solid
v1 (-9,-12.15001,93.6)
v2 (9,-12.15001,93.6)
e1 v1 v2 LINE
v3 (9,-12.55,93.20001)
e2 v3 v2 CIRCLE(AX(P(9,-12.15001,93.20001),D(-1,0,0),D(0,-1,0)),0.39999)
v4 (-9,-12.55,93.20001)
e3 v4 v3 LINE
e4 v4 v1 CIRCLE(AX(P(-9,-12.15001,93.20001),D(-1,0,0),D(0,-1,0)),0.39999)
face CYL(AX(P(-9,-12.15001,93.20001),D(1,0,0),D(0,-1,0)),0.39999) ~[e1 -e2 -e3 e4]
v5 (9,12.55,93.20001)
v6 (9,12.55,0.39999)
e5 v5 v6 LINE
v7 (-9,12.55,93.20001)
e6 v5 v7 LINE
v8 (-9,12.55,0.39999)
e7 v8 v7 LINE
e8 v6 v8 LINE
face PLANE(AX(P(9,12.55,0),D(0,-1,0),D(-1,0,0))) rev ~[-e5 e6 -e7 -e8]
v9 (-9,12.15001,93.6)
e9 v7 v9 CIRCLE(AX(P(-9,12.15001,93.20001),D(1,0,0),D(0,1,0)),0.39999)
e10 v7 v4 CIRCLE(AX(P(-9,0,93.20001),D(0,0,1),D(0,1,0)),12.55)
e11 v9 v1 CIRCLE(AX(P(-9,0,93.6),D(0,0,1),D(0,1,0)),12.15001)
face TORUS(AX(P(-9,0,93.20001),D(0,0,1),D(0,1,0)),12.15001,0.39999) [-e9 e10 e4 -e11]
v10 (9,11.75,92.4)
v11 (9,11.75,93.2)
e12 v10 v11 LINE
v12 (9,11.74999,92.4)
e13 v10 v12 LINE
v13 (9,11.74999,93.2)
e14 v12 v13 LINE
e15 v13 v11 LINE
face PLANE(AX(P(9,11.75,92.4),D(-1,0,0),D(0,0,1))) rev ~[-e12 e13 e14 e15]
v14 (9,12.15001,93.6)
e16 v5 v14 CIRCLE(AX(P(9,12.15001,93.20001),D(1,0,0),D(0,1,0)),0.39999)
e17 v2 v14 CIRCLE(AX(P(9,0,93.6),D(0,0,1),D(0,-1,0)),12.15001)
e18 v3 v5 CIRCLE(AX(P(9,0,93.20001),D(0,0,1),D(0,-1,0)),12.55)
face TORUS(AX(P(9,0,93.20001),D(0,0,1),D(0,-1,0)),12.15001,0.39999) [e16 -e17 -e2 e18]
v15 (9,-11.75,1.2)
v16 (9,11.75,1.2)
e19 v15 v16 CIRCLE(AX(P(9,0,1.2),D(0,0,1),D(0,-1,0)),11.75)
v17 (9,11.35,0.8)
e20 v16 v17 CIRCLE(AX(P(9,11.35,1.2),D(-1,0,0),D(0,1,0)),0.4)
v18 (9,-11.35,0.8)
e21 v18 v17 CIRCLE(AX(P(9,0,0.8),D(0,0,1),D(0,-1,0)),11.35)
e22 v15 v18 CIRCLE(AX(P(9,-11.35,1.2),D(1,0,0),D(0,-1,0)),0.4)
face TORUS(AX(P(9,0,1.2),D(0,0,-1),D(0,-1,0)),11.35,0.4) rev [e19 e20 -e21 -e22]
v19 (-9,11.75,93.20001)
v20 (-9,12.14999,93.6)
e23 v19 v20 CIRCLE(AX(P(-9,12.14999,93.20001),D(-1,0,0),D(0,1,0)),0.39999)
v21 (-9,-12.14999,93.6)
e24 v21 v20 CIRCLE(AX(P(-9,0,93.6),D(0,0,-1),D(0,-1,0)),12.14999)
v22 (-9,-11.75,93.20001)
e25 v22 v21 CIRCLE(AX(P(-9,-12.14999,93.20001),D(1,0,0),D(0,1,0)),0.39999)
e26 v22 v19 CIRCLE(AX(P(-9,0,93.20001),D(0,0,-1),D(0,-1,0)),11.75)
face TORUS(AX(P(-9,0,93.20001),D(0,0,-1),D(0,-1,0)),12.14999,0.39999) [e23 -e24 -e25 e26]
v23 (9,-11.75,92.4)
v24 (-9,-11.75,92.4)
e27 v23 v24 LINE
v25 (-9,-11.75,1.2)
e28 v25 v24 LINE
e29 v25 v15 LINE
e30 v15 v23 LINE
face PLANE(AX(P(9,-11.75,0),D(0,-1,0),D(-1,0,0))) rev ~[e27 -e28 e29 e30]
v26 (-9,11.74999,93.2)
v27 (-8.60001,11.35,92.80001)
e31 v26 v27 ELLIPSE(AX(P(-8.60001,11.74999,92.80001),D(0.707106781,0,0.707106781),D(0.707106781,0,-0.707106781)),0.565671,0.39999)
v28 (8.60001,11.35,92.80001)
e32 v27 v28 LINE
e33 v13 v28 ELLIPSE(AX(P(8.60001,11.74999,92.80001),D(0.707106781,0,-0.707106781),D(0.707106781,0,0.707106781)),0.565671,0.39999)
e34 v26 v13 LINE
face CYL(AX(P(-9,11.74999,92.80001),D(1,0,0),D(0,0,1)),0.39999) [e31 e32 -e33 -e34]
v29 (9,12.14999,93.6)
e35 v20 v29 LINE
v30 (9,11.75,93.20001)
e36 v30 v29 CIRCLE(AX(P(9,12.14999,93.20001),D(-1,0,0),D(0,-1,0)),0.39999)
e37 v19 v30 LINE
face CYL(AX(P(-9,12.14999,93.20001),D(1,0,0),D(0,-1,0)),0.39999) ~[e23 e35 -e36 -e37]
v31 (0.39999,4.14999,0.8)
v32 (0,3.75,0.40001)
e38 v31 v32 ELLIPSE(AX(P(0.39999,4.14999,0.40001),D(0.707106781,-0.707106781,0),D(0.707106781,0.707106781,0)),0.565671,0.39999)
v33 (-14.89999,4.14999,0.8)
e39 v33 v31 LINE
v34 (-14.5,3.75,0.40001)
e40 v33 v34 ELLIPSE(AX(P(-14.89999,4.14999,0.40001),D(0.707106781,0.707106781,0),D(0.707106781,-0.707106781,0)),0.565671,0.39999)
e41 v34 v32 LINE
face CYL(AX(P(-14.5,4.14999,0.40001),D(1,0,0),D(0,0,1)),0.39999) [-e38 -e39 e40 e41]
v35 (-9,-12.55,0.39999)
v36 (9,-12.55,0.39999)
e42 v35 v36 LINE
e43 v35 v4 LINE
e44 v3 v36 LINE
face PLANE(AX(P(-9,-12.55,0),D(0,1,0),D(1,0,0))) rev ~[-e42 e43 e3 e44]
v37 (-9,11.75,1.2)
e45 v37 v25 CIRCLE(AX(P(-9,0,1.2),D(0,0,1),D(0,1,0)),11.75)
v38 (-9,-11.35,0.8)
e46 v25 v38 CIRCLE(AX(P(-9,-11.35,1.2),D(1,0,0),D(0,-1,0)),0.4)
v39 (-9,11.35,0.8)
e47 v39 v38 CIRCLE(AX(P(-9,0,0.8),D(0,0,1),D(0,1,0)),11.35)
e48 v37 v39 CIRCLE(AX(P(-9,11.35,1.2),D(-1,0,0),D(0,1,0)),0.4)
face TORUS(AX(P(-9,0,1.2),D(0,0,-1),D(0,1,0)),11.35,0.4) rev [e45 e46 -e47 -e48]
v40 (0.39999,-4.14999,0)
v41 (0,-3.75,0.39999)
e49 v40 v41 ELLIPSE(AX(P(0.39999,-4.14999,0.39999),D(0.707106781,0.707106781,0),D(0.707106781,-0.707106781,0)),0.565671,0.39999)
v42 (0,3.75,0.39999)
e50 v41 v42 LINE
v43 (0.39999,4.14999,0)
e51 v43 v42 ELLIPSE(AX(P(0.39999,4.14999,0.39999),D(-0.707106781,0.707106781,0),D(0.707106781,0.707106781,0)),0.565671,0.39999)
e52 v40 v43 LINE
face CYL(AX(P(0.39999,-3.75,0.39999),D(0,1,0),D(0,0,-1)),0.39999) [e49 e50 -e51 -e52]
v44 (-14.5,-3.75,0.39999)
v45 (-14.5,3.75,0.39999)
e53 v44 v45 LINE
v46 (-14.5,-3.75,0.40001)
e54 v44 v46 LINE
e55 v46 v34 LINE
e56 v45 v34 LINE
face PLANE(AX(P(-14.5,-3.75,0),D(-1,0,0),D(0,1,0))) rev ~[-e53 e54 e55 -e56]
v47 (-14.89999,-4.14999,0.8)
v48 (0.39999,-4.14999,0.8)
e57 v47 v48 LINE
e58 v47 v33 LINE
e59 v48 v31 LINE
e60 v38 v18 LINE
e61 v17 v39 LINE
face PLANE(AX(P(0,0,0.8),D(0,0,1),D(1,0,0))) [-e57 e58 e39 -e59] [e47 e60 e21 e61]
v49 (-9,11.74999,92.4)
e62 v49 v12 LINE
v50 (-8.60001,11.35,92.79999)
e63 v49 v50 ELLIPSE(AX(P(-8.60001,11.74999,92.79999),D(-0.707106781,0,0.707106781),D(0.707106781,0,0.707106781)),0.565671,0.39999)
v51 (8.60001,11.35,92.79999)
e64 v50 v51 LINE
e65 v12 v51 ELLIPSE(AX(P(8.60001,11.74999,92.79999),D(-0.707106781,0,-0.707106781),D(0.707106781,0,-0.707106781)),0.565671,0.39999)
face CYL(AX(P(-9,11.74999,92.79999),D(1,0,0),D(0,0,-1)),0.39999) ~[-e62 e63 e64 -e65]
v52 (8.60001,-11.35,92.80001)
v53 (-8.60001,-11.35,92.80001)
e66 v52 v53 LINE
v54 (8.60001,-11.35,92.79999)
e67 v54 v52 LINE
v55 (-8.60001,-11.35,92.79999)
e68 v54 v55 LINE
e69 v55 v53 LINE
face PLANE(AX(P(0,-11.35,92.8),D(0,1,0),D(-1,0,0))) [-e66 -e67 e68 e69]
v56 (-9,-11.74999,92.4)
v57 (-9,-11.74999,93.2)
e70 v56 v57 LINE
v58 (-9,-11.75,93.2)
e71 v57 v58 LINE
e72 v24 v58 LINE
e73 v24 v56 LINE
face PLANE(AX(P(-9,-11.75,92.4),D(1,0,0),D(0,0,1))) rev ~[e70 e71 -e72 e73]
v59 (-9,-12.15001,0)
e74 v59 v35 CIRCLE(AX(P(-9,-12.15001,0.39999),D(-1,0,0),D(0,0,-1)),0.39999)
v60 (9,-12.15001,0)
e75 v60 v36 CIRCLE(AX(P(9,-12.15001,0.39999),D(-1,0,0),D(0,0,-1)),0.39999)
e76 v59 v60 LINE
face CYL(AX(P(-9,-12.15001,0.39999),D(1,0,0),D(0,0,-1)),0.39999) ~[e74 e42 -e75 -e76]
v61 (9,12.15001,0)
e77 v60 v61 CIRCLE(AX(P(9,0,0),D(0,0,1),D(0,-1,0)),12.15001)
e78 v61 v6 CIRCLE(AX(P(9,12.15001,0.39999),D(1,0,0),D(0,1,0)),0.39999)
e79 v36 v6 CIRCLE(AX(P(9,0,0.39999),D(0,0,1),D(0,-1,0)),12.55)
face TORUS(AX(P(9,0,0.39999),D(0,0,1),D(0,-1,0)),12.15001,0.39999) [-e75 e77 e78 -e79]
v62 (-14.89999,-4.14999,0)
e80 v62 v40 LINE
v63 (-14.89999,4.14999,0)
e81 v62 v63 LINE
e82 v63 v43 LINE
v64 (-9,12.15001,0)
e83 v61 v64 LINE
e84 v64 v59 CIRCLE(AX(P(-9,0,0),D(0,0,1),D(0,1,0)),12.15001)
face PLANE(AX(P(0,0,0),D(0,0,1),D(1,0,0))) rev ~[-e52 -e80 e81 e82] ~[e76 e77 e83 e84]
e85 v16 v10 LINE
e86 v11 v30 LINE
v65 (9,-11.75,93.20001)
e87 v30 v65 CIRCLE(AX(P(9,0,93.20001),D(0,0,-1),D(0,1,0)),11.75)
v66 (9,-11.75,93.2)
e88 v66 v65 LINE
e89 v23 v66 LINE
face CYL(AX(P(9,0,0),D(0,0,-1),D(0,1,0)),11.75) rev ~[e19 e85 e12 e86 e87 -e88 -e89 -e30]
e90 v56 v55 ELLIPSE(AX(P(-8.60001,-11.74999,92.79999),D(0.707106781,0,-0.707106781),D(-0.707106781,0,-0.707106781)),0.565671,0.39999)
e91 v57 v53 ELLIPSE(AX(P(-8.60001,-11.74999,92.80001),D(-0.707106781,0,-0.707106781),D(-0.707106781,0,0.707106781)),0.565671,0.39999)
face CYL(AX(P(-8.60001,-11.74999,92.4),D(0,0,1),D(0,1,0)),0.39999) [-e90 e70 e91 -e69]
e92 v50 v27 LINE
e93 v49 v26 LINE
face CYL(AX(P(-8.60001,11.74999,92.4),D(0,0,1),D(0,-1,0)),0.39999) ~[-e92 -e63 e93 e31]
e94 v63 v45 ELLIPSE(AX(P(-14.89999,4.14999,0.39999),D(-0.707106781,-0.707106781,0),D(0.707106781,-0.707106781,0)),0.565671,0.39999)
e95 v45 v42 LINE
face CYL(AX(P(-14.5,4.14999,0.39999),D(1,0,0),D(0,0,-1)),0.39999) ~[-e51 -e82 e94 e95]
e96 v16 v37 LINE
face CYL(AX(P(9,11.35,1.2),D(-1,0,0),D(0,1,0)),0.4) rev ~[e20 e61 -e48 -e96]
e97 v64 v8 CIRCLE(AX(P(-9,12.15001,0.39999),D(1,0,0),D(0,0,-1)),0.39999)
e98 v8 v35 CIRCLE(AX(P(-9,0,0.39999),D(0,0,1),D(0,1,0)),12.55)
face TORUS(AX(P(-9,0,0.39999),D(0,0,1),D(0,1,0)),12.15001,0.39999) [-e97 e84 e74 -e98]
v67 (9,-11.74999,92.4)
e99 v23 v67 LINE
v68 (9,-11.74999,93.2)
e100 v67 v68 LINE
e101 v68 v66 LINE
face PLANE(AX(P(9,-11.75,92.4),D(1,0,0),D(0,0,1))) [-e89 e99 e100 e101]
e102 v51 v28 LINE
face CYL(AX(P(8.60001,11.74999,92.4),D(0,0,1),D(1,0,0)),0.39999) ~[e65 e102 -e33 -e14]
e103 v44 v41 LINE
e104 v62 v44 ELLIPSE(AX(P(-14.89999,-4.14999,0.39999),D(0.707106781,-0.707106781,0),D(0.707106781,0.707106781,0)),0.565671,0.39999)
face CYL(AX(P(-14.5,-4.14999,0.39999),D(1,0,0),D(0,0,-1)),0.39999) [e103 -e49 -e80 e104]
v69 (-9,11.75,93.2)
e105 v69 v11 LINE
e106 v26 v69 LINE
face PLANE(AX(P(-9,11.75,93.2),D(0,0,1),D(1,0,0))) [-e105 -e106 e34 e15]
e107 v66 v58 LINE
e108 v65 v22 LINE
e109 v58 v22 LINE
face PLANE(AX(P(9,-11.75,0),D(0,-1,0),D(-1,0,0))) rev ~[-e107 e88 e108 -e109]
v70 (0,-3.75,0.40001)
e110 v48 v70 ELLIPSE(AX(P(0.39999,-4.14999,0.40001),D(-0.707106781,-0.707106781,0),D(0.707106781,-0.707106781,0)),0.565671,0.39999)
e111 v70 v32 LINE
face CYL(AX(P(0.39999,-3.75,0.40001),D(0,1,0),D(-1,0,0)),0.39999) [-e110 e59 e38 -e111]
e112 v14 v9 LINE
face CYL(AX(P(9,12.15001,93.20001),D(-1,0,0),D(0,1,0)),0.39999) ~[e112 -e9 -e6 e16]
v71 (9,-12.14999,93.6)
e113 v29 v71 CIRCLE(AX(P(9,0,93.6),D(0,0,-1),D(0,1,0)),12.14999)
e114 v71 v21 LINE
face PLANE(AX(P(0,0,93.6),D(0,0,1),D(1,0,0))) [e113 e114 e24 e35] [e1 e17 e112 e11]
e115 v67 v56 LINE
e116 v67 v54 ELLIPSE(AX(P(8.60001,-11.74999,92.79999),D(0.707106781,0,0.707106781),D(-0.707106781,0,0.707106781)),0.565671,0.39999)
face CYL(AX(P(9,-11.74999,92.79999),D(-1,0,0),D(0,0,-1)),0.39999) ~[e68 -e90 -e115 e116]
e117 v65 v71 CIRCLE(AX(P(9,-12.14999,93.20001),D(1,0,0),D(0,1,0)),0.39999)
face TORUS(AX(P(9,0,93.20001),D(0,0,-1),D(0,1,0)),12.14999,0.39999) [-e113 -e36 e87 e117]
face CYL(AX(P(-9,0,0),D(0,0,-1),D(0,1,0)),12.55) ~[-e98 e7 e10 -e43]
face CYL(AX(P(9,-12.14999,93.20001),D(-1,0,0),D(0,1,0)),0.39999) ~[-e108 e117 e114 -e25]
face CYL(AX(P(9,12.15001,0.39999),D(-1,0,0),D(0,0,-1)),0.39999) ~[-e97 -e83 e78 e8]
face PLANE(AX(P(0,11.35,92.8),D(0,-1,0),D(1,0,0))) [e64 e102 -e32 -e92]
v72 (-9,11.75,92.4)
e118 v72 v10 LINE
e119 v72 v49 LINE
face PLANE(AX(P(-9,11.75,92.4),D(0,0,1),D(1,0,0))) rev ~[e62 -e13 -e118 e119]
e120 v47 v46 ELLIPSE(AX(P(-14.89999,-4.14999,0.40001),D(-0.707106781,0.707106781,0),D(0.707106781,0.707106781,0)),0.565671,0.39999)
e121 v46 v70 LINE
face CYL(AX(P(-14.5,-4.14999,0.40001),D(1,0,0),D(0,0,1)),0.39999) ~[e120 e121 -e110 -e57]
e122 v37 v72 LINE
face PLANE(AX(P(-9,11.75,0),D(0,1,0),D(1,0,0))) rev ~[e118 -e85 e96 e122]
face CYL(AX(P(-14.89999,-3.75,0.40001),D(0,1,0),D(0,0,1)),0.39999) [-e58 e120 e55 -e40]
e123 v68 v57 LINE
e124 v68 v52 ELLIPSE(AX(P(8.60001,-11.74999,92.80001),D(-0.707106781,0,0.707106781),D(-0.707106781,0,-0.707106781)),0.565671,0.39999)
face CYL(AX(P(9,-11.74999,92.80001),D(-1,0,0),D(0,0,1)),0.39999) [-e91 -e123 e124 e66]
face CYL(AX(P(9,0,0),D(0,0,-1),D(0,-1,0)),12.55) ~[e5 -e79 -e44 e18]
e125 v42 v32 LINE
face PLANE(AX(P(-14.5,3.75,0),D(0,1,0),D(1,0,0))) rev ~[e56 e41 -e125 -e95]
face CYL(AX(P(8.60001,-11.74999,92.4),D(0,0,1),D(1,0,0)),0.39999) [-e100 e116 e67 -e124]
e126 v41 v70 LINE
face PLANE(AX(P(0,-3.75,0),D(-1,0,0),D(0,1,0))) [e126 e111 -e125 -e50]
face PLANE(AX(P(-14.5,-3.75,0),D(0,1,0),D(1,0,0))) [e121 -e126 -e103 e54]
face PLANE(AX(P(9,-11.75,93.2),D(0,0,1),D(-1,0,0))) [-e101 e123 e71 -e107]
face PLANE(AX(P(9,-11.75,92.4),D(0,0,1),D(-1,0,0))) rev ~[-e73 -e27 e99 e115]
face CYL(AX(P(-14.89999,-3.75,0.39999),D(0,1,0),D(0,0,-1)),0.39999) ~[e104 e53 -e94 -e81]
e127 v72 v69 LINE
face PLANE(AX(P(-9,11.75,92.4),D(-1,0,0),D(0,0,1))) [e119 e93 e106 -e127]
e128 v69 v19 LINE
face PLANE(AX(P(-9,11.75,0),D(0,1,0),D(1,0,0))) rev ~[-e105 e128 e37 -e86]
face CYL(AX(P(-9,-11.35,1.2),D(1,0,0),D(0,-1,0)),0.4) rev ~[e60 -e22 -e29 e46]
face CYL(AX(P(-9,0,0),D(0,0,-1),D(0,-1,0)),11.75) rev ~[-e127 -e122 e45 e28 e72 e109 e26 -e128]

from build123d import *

# Parameters (mm, degrees)
F0_W     = 14.5
F0_H     = 7.5
F1_DEPTH = 0.8
F2_DEPTH = 93.6
F3_R     = 0.39999
F4_R     = 0.4
F5_W     = 18
F5_H     = 0.8
F6_W     = 18
F6_H     = 0.8
F7_DEPTH = 0.4
F8_R     = 0.39999


# Not quite as in the source:
# - a fillet or chamfer is up to 0.001 mm smaller than in the source, because OpenCascade refuses the exact size
# - a feature names something its author has since deleted; it is built from what else it names


with BuildPart() as f1:
    # F0 (on Top) → F1 (new body)
    with BuildSketch(Plane.XY):
        with BuildLine():
            Line((9, 12.55), (-9, 12.55))
            ThreePointArc((-9, 12.55), (-21.55, 0), (-9, -12.55))
            Line((-9, -12.55), (9, -12.55))
            ThreePointArc((9, -12.55), (21.55, 0), (9, 12.55))
        make_face()
        with BuildLine():
            ThreePointArc((-9, -11.75), (-20.75, 0), (-9, 11.75))
            Line((-9, 11.75), (9, 11.75))
            ThreePointArc((9, 11.75), (20.75, 0), (9, -11.75))
            Line((9, -11.75), (-9, -11.75))
        make_face(mode=Mode.SUBTRACT)
        with BuildLine():
            Line((9, 11.75), (-9, 11.75))
            ThreePointArc((-9, 11.75), (-20.75, 0), (-9, -11.75))
            Line((-9, -11.75), (9, -11.75))
            ThreePointArc((9, -11.75), (20.75, 0), (9, 11.75))
        make_face()
        with Locations((-7.25, 0)):
            Rectangle(F0_W, F0_H, mode=Mode.SUBTRACT)
    extrude(amount=F1_DEPTH)

    # F0 (on Top) → F2 (join)
    with BuildSketch(Plane.XY):
        with BuildLine():
            Line((9, 12.55), (-9, 12.55))
            ThreePointArc((-9, 12.55), (-21.55, 0), (-9, -12.55))
            Line((-9, -12.55), (9, -12.55))
            ThreePointArc((9, -12.55), (21.55, 0), (9, 12.55))
        make_face()
        with BuildLine():
            ThreePointArc((-9, -11.75), (-20.75, 0), (-9, 11.75))
            Line((-9, 11.75), (9, 11.75))
            ThreePointArc((9, 11.75), (20.75, 0), (9, -11.75))
            Line((9, -11.75), (-9, -11.75))
        make_face(mode=Mode.SUBTRACT)
    extrude(amount=F2_DEPTH)

    # F3 (radius 0.4 in the source; OpenCascade refuses exactly that, so slightly less here)
    f3_edges = [f1.edges().sort_by_distance(p)[0] for p in [
        (0, -12.55, 93.6),
        (0, -11.75, 93.6),
        (0, -12.55, 0),
        (-7.25, 3.75, 0),
        (-7.25, 3.75, 0.8),
        (-14.5, 0, 0),
        (-14.5, 0, 0.8),
        (-7.25, -3.75, 0),
        (-7.25, -3.75, 0.8),
        (0, 0, 0),
        (0, 0, 0.8),
    ]]
    fillet(f3_edges, radius=F3_R)

    # F4
    f4_edges = [f1.edges().sort_by_distance(p)[0] for p in [
        (0, 11.75, 0.8),
    ]]
    fillet(f4_edges, radius=F4_R)

    # F5 (on face) + F6 (on face) → F7 (join, symmetric)
    with BuildSketch(Plane.XZ.offset(-11.75)):
        with Locations((0, 92.8)):
            Rectangle(F5_W, F5_H)
    with BuildSketch(Plane(origin=(0, -11.75, 0), x_dir=(-1, 0, 0), z_dir=(0, 1, 0))):
        with Locations((0, 92.8)):
            Rectangle(F6_W, F6_H)
    extrude(amount=F7_DEPTH, both=True, dir=(0, -1, 0))

    # F8 (radius 0.4 in the source; OpenCascade refuses exactly that, so slightly less here)
    f8_edges = [f1.edges().sort_by_distance(p)[0] for p in [
        (0, 11.35, 93.2),
        (0, 11.35, 92.4),
        (-9, 11.35, 92.8),
        (9, 11.35, 92.8),
        (0, -11.35, 93.2),
        (0, -11.35, 92.4),
        (9, -11.35, 92.8),
        (-9, -11.35, 92.8),
    ]]
    fillet(f8_edges, radius=F8_R)


solid = f1.part
